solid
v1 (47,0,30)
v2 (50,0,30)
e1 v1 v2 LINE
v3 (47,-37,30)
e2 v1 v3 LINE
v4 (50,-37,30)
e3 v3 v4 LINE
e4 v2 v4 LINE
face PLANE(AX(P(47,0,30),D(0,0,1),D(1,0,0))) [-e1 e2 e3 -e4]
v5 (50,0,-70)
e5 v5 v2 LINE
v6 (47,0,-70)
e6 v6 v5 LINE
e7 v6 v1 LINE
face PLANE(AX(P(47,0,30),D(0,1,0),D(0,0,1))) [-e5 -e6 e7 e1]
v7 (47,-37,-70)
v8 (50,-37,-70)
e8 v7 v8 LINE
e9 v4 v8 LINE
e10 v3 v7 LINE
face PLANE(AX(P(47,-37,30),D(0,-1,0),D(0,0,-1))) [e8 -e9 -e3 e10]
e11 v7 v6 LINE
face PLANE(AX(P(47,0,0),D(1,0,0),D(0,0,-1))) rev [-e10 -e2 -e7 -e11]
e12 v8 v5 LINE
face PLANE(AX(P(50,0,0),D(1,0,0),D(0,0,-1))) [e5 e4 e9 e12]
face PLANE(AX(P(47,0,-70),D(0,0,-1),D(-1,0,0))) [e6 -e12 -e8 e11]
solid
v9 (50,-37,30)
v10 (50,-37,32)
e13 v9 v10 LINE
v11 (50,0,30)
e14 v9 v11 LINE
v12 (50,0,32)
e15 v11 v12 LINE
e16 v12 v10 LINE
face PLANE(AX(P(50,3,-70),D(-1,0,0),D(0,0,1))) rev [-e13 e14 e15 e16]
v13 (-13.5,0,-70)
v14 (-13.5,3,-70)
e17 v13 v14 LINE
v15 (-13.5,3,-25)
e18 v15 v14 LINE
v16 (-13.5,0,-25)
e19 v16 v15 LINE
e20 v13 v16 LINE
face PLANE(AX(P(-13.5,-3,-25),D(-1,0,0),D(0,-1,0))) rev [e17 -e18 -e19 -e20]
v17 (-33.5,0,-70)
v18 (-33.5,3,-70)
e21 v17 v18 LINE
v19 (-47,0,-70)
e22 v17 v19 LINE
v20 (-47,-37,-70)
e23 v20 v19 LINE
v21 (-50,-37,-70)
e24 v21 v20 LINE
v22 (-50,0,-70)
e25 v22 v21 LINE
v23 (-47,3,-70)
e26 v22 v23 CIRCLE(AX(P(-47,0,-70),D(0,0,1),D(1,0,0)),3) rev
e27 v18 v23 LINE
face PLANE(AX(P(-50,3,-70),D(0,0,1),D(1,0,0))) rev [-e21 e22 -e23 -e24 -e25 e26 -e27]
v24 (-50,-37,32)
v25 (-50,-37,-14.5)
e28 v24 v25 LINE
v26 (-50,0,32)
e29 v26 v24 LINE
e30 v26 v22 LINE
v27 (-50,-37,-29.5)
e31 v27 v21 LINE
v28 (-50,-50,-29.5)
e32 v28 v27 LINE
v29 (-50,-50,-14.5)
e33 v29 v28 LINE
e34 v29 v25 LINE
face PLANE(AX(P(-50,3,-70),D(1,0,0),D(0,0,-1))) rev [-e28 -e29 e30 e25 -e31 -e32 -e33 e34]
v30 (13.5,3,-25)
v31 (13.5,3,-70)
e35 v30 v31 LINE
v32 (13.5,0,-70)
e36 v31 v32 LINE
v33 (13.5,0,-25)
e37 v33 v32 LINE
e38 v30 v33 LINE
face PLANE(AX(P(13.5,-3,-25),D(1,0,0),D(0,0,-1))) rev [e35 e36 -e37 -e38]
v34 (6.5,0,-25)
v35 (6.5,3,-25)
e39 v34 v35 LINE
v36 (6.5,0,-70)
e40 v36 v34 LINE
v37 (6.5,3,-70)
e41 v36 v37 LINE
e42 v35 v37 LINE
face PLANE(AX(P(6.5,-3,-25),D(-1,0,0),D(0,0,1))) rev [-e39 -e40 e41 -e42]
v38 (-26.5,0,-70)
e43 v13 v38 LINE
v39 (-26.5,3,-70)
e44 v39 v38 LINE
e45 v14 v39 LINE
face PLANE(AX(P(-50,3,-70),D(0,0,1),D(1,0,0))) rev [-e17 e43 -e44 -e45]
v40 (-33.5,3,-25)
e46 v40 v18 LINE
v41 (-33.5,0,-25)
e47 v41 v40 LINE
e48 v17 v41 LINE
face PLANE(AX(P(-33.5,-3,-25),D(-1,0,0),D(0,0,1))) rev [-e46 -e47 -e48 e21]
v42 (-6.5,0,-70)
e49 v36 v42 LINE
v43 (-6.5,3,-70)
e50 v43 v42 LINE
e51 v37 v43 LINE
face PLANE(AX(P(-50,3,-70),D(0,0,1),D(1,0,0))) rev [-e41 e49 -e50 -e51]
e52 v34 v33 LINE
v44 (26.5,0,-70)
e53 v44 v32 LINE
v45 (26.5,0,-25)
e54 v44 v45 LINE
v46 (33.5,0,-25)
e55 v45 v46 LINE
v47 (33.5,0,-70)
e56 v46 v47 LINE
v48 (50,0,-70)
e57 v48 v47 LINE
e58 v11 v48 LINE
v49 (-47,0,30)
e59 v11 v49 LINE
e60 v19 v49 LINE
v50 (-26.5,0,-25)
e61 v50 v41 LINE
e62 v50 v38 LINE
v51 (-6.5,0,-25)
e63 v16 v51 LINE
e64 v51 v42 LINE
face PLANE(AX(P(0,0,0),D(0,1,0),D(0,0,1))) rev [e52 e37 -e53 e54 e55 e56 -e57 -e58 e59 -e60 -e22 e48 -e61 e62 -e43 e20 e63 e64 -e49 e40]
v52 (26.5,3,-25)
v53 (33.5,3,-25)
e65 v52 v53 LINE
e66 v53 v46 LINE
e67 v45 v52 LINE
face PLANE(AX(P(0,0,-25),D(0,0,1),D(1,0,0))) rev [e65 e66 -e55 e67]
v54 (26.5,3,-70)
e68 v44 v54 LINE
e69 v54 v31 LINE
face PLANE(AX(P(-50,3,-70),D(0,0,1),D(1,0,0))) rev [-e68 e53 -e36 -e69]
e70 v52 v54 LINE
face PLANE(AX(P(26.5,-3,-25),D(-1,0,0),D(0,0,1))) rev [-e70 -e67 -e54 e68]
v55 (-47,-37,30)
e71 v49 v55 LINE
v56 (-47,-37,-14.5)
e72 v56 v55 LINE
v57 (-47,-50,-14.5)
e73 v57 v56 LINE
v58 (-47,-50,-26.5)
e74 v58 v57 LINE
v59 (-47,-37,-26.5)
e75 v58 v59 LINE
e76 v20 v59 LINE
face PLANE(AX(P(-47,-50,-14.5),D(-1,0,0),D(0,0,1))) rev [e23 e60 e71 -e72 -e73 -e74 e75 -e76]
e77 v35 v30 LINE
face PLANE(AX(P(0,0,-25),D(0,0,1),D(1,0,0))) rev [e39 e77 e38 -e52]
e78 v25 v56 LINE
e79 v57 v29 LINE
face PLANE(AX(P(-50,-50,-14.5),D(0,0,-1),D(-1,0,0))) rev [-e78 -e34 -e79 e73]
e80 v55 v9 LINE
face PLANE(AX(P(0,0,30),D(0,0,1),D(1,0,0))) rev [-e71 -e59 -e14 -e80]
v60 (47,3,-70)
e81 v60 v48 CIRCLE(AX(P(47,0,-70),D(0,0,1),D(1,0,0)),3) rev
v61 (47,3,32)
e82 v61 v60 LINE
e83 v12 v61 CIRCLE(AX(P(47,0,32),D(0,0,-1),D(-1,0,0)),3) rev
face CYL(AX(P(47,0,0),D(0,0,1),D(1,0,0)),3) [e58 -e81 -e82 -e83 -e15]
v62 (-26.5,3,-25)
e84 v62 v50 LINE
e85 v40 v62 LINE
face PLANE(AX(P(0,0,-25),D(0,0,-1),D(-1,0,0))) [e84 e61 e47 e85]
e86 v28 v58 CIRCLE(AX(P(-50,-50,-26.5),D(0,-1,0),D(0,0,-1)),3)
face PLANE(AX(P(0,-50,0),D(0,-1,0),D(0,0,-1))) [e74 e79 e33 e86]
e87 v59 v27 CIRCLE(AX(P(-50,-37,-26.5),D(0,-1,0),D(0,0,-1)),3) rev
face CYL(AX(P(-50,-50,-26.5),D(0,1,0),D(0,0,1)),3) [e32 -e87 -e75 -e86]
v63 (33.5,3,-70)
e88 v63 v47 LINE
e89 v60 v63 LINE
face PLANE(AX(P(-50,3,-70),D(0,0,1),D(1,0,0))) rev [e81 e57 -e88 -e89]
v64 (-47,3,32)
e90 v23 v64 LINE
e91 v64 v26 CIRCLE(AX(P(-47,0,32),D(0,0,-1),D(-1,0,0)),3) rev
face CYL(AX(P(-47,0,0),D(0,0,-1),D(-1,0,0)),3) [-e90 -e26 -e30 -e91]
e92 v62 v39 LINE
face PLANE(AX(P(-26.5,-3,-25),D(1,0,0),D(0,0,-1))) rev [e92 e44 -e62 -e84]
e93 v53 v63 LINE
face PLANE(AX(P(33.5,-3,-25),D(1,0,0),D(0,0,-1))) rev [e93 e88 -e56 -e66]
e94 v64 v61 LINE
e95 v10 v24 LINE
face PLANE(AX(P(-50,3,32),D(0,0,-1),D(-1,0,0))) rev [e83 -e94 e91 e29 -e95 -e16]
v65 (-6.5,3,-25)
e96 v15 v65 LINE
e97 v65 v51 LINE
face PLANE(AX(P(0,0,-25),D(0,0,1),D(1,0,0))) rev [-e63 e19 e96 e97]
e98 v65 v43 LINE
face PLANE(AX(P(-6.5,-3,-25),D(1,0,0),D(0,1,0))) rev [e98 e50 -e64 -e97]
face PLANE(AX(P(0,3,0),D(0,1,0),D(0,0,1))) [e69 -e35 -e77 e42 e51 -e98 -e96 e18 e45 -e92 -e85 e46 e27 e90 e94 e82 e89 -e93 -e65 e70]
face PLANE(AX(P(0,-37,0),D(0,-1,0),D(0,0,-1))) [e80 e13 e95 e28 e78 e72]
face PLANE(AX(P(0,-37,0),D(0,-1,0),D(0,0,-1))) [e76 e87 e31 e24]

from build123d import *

# Parameters (mm, degrees)
CROQUIS1_W              = 100
CROQUIS1_H              = 102
SALIENTE_EXTRUIR1_DEPTH = 3
CROQUIS2_W              = 3
CROQUIS2_H              = 15
SALIENTE_EXTRUIR2_DEPTH = 50
CROQUIS3_W              = 3
CROQUIS3_H              = 46.5
CROQUIS3_H_2            = 40.5
SALIENTE_EXTRUIR3_DEPTH = 37
CROQUIS4_W              = 97
CROQUIS4_H              = 37
SALIENTE_EXTRUIR4_DEPTH = 2
CROQUIS5_W              = 100
CROQUIS5_H              = 37
SALIENTE_EXTRUIR5_DEPTH = 3
REDONDEO2_R             = 3
REDONDEO3_R             = 3
CROQUIS7_W              = 7
CROQUIS7_H              = 6
CORTAR_EXTRUIR1_DEPTH   = 45


with BuildPart() as part:
    # Croquis1 → Saliente-Extruir1 (new body)
    with BuildSketch(Plane(origin=(0, 0, 0), x_dir=(1, 0, 0), z_dir=(0, 1, 0))):
        with Locations((0, 19)):
            Rectangle(CROQUIS1_W, CROQUIS1_H)
    extrude(amount=SALIENTE_EXTRUIR1_DEPTH)

    # Croquis2 → Saliente-Extruir2 (add)
    with BuildSketch(Plane.XZ):
        with Locations((-48.5, -22)):
            Rectangle(CROQUIS2_W, CROQUIS2_H)
    extrude(amount=SALIENTE_EXTRUIR2_DEPTH)

    # Croquis3 → Saliente-Extruir3 (add)
    with BuildSketch(Plane.XZ):
        with Locations((-48.5, 8.75)):
            Rectangle(CROQUIS3_W, CROQUIS3_H)
        with Locations((-48.5, -49.75)):
            Rectangle(CROQUIS3_W, CROQUIS3_H_2)
    extrude(amount=SALIENTE_EXTRUIR3_DEPTH)

    # Croquis4 → Saliente-Extruir4 (add)
    with BuildSketch(Plane.XY.offset(32)):
        with Locations((1.5, -18.5)):
            Rectangle(CROQUIS4_W, CROQUIS4_H)
    extrude(amount=-SALIENTE_EXTRUIR4_DEPTH)

    # Redondeo2
    redondeo2_edges = [part.edges().sort_by_distance(p)[0] for p in [
        (50, 3, -19),
        (-50, 3, -19),
    ]]
    fillet(redondeo2_edges, radius=REDONDEO2_R)

    # Redondeo3
    redondeo3_edges = [part.edges().sort_by_distance(p)[0] for p in [
        (-47, -43.5, -29.5),
    ]]
    fillet(redondeo3_edges, radius=REDONDEO3_R - 0.0001)  # a hair under: the kernel refuses the full size

    # Croquis7 → Cortar-Extruir1 (cut)
    with BuildSketch(Plane(origin=(0, 0, -70), x_dir=(-1, 0, 0), z_dir=(0, 0, -1))):
        with Locations((30, 0)):
            Rectangle(CROQUIS7_W, CROQUIS7_H)
        with Locations((10, 0)):
            Rectangle(CROQUIS7_W, CROQUIS7_H)
        with Locations((-10, 0)):
            Rectangle(CROQUIS7_W, CROQUIS7_H)
        with Locations((-30, 0)):
            Rectangle(CROQUIS7_W, CROQUIS7_H)
    extrude(amount=-CORTAR_EXTRUIR1_DEPTH, mode=Mode.SUBTRACT)


with BuildPart() as body_2:
    # Croquis5 → Saliente-Extruir5 (new body)
    with BuildSketch(Plane(origin=(50, 0, 0), x_dir=(0, 0, -1), z_dir=(1, 0, 0))):
        with Locations((20, -18.5)):
            Rectangle(CROQUIS5_W, CROQUIS5_H)
    extrude(amount=-SALIENTE_EXTRUIR5_DEPTH)


solid = Compound([part.part, body_2.part])
